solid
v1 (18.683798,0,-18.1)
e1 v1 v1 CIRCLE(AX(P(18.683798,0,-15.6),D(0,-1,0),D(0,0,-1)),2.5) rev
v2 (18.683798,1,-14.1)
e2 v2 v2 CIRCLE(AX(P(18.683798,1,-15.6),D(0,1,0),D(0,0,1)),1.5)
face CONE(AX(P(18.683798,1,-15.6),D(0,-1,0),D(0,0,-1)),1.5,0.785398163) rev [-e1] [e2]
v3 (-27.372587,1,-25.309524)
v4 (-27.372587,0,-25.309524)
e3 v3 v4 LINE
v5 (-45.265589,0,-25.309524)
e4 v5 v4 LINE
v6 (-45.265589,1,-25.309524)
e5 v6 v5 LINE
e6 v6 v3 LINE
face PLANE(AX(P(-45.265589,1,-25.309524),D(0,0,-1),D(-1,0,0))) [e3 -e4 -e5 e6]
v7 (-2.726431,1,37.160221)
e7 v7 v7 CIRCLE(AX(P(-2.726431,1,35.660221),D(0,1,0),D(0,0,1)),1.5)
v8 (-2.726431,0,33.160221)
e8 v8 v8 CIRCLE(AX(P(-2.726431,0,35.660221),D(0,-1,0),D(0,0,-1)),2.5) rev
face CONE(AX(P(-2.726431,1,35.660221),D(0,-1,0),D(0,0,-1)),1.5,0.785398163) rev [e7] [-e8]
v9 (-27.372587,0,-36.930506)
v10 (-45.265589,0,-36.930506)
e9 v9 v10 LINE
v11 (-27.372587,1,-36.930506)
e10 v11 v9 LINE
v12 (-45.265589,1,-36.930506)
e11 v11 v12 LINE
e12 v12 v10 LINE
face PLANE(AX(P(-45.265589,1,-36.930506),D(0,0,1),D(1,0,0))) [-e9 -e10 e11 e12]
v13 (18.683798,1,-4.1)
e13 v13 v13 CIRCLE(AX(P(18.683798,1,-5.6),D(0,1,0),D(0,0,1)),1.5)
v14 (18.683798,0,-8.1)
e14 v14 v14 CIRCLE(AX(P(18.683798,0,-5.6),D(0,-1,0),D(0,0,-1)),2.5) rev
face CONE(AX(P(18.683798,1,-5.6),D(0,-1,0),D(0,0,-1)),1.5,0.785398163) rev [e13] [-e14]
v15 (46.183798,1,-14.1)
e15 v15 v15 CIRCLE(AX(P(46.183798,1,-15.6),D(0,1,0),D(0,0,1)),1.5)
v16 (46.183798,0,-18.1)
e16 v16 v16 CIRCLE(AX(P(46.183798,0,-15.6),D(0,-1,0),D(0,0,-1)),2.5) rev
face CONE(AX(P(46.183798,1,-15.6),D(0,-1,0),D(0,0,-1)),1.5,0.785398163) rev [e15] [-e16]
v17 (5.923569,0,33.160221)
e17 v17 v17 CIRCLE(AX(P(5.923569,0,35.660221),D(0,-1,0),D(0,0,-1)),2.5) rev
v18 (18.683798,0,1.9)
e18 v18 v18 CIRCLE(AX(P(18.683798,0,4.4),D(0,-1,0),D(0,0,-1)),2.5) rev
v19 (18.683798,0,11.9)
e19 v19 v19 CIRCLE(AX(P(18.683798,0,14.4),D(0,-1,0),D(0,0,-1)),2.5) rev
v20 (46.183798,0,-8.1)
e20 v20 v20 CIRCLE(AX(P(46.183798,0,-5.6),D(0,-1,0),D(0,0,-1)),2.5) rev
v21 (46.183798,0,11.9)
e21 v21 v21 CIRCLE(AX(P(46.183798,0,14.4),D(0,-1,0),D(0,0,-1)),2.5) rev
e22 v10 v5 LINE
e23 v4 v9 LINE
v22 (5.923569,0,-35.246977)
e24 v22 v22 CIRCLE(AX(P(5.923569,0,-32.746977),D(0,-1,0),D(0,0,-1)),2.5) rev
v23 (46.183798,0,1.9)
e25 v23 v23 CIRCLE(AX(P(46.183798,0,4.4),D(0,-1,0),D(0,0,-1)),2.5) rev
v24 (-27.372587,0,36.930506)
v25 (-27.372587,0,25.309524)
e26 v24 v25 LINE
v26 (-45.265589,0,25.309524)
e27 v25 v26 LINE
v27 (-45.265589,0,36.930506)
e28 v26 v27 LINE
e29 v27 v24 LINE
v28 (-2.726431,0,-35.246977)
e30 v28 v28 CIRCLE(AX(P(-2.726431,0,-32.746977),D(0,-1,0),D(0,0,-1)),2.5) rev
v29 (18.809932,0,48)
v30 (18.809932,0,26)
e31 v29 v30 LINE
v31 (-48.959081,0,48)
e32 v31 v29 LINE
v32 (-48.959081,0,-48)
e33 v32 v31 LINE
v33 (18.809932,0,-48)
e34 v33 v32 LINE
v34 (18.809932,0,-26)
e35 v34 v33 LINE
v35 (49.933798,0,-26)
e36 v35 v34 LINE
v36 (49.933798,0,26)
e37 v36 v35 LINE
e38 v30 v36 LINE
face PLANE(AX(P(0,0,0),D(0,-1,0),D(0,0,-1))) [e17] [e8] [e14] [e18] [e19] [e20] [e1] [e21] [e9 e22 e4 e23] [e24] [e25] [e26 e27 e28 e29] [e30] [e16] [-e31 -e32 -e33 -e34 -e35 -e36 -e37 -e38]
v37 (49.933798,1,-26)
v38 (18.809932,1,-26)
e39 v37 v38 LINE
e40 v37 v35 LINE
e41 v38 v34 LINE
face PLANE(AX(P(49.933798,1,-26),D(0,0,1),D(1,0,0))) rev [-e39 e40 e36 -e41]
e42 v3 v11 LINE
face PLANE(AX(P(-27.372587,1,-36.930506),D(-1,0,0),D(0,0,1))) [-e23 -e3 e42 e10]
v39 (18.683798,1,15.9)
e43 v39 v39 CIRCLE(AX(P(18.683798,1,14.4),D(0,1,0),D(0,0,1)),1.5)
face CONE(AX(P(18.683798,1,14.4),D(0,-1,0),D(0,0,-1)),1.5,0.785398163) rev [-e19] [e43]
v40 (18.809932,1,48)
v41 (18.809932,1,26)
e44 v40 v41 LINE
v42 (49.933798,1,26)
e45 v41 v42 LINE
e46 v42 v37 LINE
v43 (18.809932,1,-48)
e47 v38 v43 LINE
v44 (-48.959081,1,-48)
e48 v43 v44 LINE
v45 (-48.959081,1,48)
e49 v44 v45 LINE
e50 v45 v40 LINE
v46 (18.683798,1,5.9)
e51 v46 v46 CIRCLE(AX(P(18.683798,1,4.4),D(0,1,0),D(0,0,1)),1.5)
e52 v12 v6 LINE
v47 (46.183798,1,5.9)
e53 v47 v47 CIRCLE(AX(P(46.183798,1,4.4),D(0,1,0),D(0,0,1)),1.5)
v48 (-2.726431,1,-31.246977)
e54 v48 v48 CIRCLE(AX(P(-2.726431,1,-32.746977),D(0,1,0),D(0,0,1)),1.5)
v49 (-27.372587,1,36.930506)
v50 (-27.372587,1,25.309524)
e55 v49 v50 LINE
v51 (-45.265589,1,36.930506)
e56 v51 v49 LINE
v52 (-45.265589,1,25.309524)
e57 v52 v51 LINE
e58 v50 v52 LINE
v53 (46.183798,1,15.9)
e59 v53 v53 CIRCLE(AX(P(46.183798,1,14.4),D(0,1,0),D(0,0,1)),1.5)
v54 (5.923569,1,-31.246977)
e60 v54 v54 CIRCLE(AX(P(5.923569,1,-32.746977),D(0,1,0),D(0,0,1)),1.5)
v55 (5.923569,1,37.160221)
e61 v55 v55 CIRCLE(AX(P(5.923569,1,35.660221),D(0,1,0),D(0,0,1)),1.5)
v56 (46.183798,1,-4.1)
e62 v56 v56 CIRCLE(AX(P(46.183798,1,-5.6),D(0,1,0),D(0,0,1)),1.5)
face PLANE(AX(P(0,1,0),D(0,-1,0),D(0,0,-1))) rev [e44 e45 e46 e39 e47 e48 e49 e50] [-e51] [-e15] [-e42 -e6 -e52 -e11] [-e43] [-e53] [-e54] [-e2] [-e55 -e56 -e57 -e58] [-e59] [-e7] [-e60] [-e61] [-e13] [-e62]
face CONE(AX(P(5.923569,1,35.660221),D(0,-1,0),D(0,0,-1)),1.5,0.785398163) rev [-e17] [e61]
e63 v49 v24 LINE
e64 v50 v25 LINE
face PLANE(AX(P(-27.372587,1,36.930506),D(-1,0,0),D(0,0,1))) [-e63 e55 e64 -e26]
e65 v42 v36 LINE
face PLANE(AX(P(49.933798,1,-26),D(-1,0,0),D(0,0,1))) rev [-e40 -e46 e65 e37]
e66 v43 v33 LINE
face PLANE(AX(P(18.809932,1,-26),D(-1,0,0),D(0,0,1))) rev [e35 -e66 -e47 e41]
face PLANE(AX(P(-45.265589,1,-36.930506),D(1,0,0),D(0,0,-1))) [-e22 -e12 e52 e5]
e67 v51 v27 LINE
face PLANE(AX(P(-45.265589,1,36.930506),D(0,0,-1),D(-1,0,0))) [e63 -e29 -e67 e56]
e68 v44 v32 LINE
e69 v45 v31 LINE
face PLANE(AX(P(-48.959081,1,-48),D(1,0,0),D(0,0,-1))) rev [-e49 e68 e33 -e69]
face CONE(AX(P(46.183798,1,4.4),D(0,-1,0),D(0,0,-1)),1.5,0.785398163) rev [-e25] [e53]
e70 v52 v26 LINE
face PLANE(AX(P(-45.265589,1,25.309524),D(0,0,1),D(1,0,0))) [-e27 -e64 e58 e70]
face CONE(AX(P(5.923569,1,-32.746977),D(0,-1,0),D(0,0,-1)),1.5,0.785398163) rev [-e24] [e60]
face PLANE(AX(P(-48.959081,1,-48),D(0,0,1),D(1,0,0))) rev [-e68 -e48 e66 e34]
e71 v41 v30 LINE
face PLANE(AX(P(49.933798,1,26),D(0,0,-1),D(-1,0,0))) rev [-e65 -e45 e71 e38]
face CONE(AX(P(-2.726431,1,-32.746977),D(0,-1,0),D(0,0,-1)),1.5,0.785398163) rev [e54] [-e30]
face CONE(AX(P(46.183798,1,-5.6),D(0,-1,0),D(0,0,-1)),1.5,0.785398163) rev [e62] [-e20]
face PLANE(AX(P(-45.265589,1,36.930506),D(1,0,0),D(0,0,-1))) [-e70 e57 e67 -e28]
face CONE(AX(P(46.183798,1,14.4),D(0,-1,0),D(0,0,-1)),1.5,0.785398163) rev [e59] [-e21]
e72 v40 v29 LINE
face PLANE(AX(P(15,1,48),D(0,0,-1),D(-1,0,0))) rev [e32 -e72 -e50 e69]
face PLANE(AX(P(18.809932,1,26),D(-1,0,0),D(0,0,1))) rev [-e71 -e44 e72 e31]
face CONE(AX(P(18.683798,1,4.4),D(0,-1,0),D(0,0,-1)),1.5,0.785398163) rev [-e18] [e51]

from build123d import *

# Parameters (mm, degrees)
SKETCH_1_W          = 17.893001423
SKETCH_1_H          = 11.620982588
SKETCH_1_H_2        = 11.620982589
EXTRUDE_1_DEPTH     = 1
SKETCH_2_R          = 1.5
CUT_EXTRUDE_1_DEPTH = 10
CHAMFER_1_SIZE      = 1
SKETCH_3_R          = 1.5
CUT_EXTRUDE_2_DEPTH = 10
CHAMFER_2_SIZE      = 1


with BuildPart() as part:
    # Эскиз1 → Бобышка-Вытянуть1 (new body)
    with BuildSketch(Plane(origin=(0, 0, 0), x_dir=(1, 0, 0), z_dir=(0, 1, 0))):
        Polygon((49.933797981, 26), (18.809932441, 26), (18.809932441, 48), (15, 48), (-48.959081244, 48), (-48.959081244, -48), (15, -48), (18.809932441, -48), (18.809932441, -26), (49.933797981, -26), align=None)
        with Locations((-36.319088007, -31.12001489)):
            Rectangle(SKETCH_1_W, SKETCH_1_H, mode=Mode.SUBTRACT)
        with Locations((-36.319088007, 31.12001489)):
            Rectangle(SKETCH_1_W, SKETCH_1_H_2, mode=Mode.SUBTRACT)
    extrude(amount=EXTRUDE_1_DEPTH)

    # Эскиз2 → Вырез-Вытянуть1 (cut)
    with BuildSketch(Plane(origin=(0, 1, 0), x_dir=(1, 0, 0), z_dir=(0, 1, 0))):
        with Locations(Location((46.183797981, -14.4, 0), (0, 0, 270))):
            Circle(SKETCH_2_R)
        with Locations(Location((18.683797981, -14.4, 0), (0, 0, 270))):
            Circle(SKETCH_2_R)
        with Locations(Location((18.683797981, -4.4, 0), (0, 0, 270))):
            Circle(SKETCH_2_R)
        with Locations(Location((46.183797981, -4.4, 0), (0, 0, 270))):
            Circle(SKETCH_2_R)
        with Locations(Location((18.683797981, 5.6, 0), (0, 0, 270))):
            Circle(SKETCH_2_R)
        with Locations(Location((46.183797981, 5.6, 0), (0, 0, 270))):
            Circle(SKETCH_2_R)
        with Locations(Location((18.683797981, 15.6, 0), (0, 0, 270))):
            Circle(SKETCH_2_R)
        with Locations(Location((46.183797981, 15.6, 0), (0, 0, 270))):
            Circle(SKETCH_2_R)
    extrude(amount=-CUT_EXTRUDE_1_DEPTH, mode=Mode.SUBTRACT)

    # Фаска1
    chamfer_1_edges = [part.edges().sort_by_distance(p)[0] for p in [
        (46.183797981, 0, -7.1),
        (18.683797981, 0, 2.9),
        (46.183797981, 0, 2.9),
        (18.683797981, 0, 12.9),
        (18.683797981, 0, -17.1),
        (46.183797981, 0, -17.1),
        (18.683797981, 0, -7.1),
        (46.183797981, 0, 12.9),
    ]]
    chamfer(chamfer_1_edges, length=CHAMFER_1_SIZE - 0.0001)  # a hair under: the kernel refuses the full size

    # Эскиз3 → Вырез-Вытянуть2 (cut)
    with BuildSketch(Plane(origin=(0, 1, 0), x_dir=(1, 0, 0), z_dir=(0, 1, 0))):
        with Locations(Location((5.923569009, 32.746976788, 0), (0, 0, 270))):
            Circle(SKETCH_3_R)
        with Locations(Location((-2.726430991, 32.746976788, 0), (0, 0, 270))):
            Circle(SKETCH_3_R)
        with Locations(Location((-2.726430991, -35.660220789, 0), (0, 0, 270))):
            Circle(SKETCH_3_R)
        with Locations(Location((5.923569009, -35.660220789, 0), (0, 0, 270))):
            Circle(SKETCH_3_R)
    extrude(amount=-CUT_EXTRUDE_2_DEPTH, mode=Mode.SUBTRACT)

    # Фаска2
    chamfer_2_edges = [part.edges().sort_by_distance(p)[0] for p in [
        (5.923569009, 0, 34.160220789),
        (-2.726430991, 0, 34.160220789),
        (-2.726430991, 0, -34.246976788),
        (5.923569009, 0, -34.246976788),
    ]]
    chamfer(chamfer_2_edges, length=CHAMFER_2_SIZE - 0.0001)  # a hair under: the kernel refuses the full size


solid = part.part
